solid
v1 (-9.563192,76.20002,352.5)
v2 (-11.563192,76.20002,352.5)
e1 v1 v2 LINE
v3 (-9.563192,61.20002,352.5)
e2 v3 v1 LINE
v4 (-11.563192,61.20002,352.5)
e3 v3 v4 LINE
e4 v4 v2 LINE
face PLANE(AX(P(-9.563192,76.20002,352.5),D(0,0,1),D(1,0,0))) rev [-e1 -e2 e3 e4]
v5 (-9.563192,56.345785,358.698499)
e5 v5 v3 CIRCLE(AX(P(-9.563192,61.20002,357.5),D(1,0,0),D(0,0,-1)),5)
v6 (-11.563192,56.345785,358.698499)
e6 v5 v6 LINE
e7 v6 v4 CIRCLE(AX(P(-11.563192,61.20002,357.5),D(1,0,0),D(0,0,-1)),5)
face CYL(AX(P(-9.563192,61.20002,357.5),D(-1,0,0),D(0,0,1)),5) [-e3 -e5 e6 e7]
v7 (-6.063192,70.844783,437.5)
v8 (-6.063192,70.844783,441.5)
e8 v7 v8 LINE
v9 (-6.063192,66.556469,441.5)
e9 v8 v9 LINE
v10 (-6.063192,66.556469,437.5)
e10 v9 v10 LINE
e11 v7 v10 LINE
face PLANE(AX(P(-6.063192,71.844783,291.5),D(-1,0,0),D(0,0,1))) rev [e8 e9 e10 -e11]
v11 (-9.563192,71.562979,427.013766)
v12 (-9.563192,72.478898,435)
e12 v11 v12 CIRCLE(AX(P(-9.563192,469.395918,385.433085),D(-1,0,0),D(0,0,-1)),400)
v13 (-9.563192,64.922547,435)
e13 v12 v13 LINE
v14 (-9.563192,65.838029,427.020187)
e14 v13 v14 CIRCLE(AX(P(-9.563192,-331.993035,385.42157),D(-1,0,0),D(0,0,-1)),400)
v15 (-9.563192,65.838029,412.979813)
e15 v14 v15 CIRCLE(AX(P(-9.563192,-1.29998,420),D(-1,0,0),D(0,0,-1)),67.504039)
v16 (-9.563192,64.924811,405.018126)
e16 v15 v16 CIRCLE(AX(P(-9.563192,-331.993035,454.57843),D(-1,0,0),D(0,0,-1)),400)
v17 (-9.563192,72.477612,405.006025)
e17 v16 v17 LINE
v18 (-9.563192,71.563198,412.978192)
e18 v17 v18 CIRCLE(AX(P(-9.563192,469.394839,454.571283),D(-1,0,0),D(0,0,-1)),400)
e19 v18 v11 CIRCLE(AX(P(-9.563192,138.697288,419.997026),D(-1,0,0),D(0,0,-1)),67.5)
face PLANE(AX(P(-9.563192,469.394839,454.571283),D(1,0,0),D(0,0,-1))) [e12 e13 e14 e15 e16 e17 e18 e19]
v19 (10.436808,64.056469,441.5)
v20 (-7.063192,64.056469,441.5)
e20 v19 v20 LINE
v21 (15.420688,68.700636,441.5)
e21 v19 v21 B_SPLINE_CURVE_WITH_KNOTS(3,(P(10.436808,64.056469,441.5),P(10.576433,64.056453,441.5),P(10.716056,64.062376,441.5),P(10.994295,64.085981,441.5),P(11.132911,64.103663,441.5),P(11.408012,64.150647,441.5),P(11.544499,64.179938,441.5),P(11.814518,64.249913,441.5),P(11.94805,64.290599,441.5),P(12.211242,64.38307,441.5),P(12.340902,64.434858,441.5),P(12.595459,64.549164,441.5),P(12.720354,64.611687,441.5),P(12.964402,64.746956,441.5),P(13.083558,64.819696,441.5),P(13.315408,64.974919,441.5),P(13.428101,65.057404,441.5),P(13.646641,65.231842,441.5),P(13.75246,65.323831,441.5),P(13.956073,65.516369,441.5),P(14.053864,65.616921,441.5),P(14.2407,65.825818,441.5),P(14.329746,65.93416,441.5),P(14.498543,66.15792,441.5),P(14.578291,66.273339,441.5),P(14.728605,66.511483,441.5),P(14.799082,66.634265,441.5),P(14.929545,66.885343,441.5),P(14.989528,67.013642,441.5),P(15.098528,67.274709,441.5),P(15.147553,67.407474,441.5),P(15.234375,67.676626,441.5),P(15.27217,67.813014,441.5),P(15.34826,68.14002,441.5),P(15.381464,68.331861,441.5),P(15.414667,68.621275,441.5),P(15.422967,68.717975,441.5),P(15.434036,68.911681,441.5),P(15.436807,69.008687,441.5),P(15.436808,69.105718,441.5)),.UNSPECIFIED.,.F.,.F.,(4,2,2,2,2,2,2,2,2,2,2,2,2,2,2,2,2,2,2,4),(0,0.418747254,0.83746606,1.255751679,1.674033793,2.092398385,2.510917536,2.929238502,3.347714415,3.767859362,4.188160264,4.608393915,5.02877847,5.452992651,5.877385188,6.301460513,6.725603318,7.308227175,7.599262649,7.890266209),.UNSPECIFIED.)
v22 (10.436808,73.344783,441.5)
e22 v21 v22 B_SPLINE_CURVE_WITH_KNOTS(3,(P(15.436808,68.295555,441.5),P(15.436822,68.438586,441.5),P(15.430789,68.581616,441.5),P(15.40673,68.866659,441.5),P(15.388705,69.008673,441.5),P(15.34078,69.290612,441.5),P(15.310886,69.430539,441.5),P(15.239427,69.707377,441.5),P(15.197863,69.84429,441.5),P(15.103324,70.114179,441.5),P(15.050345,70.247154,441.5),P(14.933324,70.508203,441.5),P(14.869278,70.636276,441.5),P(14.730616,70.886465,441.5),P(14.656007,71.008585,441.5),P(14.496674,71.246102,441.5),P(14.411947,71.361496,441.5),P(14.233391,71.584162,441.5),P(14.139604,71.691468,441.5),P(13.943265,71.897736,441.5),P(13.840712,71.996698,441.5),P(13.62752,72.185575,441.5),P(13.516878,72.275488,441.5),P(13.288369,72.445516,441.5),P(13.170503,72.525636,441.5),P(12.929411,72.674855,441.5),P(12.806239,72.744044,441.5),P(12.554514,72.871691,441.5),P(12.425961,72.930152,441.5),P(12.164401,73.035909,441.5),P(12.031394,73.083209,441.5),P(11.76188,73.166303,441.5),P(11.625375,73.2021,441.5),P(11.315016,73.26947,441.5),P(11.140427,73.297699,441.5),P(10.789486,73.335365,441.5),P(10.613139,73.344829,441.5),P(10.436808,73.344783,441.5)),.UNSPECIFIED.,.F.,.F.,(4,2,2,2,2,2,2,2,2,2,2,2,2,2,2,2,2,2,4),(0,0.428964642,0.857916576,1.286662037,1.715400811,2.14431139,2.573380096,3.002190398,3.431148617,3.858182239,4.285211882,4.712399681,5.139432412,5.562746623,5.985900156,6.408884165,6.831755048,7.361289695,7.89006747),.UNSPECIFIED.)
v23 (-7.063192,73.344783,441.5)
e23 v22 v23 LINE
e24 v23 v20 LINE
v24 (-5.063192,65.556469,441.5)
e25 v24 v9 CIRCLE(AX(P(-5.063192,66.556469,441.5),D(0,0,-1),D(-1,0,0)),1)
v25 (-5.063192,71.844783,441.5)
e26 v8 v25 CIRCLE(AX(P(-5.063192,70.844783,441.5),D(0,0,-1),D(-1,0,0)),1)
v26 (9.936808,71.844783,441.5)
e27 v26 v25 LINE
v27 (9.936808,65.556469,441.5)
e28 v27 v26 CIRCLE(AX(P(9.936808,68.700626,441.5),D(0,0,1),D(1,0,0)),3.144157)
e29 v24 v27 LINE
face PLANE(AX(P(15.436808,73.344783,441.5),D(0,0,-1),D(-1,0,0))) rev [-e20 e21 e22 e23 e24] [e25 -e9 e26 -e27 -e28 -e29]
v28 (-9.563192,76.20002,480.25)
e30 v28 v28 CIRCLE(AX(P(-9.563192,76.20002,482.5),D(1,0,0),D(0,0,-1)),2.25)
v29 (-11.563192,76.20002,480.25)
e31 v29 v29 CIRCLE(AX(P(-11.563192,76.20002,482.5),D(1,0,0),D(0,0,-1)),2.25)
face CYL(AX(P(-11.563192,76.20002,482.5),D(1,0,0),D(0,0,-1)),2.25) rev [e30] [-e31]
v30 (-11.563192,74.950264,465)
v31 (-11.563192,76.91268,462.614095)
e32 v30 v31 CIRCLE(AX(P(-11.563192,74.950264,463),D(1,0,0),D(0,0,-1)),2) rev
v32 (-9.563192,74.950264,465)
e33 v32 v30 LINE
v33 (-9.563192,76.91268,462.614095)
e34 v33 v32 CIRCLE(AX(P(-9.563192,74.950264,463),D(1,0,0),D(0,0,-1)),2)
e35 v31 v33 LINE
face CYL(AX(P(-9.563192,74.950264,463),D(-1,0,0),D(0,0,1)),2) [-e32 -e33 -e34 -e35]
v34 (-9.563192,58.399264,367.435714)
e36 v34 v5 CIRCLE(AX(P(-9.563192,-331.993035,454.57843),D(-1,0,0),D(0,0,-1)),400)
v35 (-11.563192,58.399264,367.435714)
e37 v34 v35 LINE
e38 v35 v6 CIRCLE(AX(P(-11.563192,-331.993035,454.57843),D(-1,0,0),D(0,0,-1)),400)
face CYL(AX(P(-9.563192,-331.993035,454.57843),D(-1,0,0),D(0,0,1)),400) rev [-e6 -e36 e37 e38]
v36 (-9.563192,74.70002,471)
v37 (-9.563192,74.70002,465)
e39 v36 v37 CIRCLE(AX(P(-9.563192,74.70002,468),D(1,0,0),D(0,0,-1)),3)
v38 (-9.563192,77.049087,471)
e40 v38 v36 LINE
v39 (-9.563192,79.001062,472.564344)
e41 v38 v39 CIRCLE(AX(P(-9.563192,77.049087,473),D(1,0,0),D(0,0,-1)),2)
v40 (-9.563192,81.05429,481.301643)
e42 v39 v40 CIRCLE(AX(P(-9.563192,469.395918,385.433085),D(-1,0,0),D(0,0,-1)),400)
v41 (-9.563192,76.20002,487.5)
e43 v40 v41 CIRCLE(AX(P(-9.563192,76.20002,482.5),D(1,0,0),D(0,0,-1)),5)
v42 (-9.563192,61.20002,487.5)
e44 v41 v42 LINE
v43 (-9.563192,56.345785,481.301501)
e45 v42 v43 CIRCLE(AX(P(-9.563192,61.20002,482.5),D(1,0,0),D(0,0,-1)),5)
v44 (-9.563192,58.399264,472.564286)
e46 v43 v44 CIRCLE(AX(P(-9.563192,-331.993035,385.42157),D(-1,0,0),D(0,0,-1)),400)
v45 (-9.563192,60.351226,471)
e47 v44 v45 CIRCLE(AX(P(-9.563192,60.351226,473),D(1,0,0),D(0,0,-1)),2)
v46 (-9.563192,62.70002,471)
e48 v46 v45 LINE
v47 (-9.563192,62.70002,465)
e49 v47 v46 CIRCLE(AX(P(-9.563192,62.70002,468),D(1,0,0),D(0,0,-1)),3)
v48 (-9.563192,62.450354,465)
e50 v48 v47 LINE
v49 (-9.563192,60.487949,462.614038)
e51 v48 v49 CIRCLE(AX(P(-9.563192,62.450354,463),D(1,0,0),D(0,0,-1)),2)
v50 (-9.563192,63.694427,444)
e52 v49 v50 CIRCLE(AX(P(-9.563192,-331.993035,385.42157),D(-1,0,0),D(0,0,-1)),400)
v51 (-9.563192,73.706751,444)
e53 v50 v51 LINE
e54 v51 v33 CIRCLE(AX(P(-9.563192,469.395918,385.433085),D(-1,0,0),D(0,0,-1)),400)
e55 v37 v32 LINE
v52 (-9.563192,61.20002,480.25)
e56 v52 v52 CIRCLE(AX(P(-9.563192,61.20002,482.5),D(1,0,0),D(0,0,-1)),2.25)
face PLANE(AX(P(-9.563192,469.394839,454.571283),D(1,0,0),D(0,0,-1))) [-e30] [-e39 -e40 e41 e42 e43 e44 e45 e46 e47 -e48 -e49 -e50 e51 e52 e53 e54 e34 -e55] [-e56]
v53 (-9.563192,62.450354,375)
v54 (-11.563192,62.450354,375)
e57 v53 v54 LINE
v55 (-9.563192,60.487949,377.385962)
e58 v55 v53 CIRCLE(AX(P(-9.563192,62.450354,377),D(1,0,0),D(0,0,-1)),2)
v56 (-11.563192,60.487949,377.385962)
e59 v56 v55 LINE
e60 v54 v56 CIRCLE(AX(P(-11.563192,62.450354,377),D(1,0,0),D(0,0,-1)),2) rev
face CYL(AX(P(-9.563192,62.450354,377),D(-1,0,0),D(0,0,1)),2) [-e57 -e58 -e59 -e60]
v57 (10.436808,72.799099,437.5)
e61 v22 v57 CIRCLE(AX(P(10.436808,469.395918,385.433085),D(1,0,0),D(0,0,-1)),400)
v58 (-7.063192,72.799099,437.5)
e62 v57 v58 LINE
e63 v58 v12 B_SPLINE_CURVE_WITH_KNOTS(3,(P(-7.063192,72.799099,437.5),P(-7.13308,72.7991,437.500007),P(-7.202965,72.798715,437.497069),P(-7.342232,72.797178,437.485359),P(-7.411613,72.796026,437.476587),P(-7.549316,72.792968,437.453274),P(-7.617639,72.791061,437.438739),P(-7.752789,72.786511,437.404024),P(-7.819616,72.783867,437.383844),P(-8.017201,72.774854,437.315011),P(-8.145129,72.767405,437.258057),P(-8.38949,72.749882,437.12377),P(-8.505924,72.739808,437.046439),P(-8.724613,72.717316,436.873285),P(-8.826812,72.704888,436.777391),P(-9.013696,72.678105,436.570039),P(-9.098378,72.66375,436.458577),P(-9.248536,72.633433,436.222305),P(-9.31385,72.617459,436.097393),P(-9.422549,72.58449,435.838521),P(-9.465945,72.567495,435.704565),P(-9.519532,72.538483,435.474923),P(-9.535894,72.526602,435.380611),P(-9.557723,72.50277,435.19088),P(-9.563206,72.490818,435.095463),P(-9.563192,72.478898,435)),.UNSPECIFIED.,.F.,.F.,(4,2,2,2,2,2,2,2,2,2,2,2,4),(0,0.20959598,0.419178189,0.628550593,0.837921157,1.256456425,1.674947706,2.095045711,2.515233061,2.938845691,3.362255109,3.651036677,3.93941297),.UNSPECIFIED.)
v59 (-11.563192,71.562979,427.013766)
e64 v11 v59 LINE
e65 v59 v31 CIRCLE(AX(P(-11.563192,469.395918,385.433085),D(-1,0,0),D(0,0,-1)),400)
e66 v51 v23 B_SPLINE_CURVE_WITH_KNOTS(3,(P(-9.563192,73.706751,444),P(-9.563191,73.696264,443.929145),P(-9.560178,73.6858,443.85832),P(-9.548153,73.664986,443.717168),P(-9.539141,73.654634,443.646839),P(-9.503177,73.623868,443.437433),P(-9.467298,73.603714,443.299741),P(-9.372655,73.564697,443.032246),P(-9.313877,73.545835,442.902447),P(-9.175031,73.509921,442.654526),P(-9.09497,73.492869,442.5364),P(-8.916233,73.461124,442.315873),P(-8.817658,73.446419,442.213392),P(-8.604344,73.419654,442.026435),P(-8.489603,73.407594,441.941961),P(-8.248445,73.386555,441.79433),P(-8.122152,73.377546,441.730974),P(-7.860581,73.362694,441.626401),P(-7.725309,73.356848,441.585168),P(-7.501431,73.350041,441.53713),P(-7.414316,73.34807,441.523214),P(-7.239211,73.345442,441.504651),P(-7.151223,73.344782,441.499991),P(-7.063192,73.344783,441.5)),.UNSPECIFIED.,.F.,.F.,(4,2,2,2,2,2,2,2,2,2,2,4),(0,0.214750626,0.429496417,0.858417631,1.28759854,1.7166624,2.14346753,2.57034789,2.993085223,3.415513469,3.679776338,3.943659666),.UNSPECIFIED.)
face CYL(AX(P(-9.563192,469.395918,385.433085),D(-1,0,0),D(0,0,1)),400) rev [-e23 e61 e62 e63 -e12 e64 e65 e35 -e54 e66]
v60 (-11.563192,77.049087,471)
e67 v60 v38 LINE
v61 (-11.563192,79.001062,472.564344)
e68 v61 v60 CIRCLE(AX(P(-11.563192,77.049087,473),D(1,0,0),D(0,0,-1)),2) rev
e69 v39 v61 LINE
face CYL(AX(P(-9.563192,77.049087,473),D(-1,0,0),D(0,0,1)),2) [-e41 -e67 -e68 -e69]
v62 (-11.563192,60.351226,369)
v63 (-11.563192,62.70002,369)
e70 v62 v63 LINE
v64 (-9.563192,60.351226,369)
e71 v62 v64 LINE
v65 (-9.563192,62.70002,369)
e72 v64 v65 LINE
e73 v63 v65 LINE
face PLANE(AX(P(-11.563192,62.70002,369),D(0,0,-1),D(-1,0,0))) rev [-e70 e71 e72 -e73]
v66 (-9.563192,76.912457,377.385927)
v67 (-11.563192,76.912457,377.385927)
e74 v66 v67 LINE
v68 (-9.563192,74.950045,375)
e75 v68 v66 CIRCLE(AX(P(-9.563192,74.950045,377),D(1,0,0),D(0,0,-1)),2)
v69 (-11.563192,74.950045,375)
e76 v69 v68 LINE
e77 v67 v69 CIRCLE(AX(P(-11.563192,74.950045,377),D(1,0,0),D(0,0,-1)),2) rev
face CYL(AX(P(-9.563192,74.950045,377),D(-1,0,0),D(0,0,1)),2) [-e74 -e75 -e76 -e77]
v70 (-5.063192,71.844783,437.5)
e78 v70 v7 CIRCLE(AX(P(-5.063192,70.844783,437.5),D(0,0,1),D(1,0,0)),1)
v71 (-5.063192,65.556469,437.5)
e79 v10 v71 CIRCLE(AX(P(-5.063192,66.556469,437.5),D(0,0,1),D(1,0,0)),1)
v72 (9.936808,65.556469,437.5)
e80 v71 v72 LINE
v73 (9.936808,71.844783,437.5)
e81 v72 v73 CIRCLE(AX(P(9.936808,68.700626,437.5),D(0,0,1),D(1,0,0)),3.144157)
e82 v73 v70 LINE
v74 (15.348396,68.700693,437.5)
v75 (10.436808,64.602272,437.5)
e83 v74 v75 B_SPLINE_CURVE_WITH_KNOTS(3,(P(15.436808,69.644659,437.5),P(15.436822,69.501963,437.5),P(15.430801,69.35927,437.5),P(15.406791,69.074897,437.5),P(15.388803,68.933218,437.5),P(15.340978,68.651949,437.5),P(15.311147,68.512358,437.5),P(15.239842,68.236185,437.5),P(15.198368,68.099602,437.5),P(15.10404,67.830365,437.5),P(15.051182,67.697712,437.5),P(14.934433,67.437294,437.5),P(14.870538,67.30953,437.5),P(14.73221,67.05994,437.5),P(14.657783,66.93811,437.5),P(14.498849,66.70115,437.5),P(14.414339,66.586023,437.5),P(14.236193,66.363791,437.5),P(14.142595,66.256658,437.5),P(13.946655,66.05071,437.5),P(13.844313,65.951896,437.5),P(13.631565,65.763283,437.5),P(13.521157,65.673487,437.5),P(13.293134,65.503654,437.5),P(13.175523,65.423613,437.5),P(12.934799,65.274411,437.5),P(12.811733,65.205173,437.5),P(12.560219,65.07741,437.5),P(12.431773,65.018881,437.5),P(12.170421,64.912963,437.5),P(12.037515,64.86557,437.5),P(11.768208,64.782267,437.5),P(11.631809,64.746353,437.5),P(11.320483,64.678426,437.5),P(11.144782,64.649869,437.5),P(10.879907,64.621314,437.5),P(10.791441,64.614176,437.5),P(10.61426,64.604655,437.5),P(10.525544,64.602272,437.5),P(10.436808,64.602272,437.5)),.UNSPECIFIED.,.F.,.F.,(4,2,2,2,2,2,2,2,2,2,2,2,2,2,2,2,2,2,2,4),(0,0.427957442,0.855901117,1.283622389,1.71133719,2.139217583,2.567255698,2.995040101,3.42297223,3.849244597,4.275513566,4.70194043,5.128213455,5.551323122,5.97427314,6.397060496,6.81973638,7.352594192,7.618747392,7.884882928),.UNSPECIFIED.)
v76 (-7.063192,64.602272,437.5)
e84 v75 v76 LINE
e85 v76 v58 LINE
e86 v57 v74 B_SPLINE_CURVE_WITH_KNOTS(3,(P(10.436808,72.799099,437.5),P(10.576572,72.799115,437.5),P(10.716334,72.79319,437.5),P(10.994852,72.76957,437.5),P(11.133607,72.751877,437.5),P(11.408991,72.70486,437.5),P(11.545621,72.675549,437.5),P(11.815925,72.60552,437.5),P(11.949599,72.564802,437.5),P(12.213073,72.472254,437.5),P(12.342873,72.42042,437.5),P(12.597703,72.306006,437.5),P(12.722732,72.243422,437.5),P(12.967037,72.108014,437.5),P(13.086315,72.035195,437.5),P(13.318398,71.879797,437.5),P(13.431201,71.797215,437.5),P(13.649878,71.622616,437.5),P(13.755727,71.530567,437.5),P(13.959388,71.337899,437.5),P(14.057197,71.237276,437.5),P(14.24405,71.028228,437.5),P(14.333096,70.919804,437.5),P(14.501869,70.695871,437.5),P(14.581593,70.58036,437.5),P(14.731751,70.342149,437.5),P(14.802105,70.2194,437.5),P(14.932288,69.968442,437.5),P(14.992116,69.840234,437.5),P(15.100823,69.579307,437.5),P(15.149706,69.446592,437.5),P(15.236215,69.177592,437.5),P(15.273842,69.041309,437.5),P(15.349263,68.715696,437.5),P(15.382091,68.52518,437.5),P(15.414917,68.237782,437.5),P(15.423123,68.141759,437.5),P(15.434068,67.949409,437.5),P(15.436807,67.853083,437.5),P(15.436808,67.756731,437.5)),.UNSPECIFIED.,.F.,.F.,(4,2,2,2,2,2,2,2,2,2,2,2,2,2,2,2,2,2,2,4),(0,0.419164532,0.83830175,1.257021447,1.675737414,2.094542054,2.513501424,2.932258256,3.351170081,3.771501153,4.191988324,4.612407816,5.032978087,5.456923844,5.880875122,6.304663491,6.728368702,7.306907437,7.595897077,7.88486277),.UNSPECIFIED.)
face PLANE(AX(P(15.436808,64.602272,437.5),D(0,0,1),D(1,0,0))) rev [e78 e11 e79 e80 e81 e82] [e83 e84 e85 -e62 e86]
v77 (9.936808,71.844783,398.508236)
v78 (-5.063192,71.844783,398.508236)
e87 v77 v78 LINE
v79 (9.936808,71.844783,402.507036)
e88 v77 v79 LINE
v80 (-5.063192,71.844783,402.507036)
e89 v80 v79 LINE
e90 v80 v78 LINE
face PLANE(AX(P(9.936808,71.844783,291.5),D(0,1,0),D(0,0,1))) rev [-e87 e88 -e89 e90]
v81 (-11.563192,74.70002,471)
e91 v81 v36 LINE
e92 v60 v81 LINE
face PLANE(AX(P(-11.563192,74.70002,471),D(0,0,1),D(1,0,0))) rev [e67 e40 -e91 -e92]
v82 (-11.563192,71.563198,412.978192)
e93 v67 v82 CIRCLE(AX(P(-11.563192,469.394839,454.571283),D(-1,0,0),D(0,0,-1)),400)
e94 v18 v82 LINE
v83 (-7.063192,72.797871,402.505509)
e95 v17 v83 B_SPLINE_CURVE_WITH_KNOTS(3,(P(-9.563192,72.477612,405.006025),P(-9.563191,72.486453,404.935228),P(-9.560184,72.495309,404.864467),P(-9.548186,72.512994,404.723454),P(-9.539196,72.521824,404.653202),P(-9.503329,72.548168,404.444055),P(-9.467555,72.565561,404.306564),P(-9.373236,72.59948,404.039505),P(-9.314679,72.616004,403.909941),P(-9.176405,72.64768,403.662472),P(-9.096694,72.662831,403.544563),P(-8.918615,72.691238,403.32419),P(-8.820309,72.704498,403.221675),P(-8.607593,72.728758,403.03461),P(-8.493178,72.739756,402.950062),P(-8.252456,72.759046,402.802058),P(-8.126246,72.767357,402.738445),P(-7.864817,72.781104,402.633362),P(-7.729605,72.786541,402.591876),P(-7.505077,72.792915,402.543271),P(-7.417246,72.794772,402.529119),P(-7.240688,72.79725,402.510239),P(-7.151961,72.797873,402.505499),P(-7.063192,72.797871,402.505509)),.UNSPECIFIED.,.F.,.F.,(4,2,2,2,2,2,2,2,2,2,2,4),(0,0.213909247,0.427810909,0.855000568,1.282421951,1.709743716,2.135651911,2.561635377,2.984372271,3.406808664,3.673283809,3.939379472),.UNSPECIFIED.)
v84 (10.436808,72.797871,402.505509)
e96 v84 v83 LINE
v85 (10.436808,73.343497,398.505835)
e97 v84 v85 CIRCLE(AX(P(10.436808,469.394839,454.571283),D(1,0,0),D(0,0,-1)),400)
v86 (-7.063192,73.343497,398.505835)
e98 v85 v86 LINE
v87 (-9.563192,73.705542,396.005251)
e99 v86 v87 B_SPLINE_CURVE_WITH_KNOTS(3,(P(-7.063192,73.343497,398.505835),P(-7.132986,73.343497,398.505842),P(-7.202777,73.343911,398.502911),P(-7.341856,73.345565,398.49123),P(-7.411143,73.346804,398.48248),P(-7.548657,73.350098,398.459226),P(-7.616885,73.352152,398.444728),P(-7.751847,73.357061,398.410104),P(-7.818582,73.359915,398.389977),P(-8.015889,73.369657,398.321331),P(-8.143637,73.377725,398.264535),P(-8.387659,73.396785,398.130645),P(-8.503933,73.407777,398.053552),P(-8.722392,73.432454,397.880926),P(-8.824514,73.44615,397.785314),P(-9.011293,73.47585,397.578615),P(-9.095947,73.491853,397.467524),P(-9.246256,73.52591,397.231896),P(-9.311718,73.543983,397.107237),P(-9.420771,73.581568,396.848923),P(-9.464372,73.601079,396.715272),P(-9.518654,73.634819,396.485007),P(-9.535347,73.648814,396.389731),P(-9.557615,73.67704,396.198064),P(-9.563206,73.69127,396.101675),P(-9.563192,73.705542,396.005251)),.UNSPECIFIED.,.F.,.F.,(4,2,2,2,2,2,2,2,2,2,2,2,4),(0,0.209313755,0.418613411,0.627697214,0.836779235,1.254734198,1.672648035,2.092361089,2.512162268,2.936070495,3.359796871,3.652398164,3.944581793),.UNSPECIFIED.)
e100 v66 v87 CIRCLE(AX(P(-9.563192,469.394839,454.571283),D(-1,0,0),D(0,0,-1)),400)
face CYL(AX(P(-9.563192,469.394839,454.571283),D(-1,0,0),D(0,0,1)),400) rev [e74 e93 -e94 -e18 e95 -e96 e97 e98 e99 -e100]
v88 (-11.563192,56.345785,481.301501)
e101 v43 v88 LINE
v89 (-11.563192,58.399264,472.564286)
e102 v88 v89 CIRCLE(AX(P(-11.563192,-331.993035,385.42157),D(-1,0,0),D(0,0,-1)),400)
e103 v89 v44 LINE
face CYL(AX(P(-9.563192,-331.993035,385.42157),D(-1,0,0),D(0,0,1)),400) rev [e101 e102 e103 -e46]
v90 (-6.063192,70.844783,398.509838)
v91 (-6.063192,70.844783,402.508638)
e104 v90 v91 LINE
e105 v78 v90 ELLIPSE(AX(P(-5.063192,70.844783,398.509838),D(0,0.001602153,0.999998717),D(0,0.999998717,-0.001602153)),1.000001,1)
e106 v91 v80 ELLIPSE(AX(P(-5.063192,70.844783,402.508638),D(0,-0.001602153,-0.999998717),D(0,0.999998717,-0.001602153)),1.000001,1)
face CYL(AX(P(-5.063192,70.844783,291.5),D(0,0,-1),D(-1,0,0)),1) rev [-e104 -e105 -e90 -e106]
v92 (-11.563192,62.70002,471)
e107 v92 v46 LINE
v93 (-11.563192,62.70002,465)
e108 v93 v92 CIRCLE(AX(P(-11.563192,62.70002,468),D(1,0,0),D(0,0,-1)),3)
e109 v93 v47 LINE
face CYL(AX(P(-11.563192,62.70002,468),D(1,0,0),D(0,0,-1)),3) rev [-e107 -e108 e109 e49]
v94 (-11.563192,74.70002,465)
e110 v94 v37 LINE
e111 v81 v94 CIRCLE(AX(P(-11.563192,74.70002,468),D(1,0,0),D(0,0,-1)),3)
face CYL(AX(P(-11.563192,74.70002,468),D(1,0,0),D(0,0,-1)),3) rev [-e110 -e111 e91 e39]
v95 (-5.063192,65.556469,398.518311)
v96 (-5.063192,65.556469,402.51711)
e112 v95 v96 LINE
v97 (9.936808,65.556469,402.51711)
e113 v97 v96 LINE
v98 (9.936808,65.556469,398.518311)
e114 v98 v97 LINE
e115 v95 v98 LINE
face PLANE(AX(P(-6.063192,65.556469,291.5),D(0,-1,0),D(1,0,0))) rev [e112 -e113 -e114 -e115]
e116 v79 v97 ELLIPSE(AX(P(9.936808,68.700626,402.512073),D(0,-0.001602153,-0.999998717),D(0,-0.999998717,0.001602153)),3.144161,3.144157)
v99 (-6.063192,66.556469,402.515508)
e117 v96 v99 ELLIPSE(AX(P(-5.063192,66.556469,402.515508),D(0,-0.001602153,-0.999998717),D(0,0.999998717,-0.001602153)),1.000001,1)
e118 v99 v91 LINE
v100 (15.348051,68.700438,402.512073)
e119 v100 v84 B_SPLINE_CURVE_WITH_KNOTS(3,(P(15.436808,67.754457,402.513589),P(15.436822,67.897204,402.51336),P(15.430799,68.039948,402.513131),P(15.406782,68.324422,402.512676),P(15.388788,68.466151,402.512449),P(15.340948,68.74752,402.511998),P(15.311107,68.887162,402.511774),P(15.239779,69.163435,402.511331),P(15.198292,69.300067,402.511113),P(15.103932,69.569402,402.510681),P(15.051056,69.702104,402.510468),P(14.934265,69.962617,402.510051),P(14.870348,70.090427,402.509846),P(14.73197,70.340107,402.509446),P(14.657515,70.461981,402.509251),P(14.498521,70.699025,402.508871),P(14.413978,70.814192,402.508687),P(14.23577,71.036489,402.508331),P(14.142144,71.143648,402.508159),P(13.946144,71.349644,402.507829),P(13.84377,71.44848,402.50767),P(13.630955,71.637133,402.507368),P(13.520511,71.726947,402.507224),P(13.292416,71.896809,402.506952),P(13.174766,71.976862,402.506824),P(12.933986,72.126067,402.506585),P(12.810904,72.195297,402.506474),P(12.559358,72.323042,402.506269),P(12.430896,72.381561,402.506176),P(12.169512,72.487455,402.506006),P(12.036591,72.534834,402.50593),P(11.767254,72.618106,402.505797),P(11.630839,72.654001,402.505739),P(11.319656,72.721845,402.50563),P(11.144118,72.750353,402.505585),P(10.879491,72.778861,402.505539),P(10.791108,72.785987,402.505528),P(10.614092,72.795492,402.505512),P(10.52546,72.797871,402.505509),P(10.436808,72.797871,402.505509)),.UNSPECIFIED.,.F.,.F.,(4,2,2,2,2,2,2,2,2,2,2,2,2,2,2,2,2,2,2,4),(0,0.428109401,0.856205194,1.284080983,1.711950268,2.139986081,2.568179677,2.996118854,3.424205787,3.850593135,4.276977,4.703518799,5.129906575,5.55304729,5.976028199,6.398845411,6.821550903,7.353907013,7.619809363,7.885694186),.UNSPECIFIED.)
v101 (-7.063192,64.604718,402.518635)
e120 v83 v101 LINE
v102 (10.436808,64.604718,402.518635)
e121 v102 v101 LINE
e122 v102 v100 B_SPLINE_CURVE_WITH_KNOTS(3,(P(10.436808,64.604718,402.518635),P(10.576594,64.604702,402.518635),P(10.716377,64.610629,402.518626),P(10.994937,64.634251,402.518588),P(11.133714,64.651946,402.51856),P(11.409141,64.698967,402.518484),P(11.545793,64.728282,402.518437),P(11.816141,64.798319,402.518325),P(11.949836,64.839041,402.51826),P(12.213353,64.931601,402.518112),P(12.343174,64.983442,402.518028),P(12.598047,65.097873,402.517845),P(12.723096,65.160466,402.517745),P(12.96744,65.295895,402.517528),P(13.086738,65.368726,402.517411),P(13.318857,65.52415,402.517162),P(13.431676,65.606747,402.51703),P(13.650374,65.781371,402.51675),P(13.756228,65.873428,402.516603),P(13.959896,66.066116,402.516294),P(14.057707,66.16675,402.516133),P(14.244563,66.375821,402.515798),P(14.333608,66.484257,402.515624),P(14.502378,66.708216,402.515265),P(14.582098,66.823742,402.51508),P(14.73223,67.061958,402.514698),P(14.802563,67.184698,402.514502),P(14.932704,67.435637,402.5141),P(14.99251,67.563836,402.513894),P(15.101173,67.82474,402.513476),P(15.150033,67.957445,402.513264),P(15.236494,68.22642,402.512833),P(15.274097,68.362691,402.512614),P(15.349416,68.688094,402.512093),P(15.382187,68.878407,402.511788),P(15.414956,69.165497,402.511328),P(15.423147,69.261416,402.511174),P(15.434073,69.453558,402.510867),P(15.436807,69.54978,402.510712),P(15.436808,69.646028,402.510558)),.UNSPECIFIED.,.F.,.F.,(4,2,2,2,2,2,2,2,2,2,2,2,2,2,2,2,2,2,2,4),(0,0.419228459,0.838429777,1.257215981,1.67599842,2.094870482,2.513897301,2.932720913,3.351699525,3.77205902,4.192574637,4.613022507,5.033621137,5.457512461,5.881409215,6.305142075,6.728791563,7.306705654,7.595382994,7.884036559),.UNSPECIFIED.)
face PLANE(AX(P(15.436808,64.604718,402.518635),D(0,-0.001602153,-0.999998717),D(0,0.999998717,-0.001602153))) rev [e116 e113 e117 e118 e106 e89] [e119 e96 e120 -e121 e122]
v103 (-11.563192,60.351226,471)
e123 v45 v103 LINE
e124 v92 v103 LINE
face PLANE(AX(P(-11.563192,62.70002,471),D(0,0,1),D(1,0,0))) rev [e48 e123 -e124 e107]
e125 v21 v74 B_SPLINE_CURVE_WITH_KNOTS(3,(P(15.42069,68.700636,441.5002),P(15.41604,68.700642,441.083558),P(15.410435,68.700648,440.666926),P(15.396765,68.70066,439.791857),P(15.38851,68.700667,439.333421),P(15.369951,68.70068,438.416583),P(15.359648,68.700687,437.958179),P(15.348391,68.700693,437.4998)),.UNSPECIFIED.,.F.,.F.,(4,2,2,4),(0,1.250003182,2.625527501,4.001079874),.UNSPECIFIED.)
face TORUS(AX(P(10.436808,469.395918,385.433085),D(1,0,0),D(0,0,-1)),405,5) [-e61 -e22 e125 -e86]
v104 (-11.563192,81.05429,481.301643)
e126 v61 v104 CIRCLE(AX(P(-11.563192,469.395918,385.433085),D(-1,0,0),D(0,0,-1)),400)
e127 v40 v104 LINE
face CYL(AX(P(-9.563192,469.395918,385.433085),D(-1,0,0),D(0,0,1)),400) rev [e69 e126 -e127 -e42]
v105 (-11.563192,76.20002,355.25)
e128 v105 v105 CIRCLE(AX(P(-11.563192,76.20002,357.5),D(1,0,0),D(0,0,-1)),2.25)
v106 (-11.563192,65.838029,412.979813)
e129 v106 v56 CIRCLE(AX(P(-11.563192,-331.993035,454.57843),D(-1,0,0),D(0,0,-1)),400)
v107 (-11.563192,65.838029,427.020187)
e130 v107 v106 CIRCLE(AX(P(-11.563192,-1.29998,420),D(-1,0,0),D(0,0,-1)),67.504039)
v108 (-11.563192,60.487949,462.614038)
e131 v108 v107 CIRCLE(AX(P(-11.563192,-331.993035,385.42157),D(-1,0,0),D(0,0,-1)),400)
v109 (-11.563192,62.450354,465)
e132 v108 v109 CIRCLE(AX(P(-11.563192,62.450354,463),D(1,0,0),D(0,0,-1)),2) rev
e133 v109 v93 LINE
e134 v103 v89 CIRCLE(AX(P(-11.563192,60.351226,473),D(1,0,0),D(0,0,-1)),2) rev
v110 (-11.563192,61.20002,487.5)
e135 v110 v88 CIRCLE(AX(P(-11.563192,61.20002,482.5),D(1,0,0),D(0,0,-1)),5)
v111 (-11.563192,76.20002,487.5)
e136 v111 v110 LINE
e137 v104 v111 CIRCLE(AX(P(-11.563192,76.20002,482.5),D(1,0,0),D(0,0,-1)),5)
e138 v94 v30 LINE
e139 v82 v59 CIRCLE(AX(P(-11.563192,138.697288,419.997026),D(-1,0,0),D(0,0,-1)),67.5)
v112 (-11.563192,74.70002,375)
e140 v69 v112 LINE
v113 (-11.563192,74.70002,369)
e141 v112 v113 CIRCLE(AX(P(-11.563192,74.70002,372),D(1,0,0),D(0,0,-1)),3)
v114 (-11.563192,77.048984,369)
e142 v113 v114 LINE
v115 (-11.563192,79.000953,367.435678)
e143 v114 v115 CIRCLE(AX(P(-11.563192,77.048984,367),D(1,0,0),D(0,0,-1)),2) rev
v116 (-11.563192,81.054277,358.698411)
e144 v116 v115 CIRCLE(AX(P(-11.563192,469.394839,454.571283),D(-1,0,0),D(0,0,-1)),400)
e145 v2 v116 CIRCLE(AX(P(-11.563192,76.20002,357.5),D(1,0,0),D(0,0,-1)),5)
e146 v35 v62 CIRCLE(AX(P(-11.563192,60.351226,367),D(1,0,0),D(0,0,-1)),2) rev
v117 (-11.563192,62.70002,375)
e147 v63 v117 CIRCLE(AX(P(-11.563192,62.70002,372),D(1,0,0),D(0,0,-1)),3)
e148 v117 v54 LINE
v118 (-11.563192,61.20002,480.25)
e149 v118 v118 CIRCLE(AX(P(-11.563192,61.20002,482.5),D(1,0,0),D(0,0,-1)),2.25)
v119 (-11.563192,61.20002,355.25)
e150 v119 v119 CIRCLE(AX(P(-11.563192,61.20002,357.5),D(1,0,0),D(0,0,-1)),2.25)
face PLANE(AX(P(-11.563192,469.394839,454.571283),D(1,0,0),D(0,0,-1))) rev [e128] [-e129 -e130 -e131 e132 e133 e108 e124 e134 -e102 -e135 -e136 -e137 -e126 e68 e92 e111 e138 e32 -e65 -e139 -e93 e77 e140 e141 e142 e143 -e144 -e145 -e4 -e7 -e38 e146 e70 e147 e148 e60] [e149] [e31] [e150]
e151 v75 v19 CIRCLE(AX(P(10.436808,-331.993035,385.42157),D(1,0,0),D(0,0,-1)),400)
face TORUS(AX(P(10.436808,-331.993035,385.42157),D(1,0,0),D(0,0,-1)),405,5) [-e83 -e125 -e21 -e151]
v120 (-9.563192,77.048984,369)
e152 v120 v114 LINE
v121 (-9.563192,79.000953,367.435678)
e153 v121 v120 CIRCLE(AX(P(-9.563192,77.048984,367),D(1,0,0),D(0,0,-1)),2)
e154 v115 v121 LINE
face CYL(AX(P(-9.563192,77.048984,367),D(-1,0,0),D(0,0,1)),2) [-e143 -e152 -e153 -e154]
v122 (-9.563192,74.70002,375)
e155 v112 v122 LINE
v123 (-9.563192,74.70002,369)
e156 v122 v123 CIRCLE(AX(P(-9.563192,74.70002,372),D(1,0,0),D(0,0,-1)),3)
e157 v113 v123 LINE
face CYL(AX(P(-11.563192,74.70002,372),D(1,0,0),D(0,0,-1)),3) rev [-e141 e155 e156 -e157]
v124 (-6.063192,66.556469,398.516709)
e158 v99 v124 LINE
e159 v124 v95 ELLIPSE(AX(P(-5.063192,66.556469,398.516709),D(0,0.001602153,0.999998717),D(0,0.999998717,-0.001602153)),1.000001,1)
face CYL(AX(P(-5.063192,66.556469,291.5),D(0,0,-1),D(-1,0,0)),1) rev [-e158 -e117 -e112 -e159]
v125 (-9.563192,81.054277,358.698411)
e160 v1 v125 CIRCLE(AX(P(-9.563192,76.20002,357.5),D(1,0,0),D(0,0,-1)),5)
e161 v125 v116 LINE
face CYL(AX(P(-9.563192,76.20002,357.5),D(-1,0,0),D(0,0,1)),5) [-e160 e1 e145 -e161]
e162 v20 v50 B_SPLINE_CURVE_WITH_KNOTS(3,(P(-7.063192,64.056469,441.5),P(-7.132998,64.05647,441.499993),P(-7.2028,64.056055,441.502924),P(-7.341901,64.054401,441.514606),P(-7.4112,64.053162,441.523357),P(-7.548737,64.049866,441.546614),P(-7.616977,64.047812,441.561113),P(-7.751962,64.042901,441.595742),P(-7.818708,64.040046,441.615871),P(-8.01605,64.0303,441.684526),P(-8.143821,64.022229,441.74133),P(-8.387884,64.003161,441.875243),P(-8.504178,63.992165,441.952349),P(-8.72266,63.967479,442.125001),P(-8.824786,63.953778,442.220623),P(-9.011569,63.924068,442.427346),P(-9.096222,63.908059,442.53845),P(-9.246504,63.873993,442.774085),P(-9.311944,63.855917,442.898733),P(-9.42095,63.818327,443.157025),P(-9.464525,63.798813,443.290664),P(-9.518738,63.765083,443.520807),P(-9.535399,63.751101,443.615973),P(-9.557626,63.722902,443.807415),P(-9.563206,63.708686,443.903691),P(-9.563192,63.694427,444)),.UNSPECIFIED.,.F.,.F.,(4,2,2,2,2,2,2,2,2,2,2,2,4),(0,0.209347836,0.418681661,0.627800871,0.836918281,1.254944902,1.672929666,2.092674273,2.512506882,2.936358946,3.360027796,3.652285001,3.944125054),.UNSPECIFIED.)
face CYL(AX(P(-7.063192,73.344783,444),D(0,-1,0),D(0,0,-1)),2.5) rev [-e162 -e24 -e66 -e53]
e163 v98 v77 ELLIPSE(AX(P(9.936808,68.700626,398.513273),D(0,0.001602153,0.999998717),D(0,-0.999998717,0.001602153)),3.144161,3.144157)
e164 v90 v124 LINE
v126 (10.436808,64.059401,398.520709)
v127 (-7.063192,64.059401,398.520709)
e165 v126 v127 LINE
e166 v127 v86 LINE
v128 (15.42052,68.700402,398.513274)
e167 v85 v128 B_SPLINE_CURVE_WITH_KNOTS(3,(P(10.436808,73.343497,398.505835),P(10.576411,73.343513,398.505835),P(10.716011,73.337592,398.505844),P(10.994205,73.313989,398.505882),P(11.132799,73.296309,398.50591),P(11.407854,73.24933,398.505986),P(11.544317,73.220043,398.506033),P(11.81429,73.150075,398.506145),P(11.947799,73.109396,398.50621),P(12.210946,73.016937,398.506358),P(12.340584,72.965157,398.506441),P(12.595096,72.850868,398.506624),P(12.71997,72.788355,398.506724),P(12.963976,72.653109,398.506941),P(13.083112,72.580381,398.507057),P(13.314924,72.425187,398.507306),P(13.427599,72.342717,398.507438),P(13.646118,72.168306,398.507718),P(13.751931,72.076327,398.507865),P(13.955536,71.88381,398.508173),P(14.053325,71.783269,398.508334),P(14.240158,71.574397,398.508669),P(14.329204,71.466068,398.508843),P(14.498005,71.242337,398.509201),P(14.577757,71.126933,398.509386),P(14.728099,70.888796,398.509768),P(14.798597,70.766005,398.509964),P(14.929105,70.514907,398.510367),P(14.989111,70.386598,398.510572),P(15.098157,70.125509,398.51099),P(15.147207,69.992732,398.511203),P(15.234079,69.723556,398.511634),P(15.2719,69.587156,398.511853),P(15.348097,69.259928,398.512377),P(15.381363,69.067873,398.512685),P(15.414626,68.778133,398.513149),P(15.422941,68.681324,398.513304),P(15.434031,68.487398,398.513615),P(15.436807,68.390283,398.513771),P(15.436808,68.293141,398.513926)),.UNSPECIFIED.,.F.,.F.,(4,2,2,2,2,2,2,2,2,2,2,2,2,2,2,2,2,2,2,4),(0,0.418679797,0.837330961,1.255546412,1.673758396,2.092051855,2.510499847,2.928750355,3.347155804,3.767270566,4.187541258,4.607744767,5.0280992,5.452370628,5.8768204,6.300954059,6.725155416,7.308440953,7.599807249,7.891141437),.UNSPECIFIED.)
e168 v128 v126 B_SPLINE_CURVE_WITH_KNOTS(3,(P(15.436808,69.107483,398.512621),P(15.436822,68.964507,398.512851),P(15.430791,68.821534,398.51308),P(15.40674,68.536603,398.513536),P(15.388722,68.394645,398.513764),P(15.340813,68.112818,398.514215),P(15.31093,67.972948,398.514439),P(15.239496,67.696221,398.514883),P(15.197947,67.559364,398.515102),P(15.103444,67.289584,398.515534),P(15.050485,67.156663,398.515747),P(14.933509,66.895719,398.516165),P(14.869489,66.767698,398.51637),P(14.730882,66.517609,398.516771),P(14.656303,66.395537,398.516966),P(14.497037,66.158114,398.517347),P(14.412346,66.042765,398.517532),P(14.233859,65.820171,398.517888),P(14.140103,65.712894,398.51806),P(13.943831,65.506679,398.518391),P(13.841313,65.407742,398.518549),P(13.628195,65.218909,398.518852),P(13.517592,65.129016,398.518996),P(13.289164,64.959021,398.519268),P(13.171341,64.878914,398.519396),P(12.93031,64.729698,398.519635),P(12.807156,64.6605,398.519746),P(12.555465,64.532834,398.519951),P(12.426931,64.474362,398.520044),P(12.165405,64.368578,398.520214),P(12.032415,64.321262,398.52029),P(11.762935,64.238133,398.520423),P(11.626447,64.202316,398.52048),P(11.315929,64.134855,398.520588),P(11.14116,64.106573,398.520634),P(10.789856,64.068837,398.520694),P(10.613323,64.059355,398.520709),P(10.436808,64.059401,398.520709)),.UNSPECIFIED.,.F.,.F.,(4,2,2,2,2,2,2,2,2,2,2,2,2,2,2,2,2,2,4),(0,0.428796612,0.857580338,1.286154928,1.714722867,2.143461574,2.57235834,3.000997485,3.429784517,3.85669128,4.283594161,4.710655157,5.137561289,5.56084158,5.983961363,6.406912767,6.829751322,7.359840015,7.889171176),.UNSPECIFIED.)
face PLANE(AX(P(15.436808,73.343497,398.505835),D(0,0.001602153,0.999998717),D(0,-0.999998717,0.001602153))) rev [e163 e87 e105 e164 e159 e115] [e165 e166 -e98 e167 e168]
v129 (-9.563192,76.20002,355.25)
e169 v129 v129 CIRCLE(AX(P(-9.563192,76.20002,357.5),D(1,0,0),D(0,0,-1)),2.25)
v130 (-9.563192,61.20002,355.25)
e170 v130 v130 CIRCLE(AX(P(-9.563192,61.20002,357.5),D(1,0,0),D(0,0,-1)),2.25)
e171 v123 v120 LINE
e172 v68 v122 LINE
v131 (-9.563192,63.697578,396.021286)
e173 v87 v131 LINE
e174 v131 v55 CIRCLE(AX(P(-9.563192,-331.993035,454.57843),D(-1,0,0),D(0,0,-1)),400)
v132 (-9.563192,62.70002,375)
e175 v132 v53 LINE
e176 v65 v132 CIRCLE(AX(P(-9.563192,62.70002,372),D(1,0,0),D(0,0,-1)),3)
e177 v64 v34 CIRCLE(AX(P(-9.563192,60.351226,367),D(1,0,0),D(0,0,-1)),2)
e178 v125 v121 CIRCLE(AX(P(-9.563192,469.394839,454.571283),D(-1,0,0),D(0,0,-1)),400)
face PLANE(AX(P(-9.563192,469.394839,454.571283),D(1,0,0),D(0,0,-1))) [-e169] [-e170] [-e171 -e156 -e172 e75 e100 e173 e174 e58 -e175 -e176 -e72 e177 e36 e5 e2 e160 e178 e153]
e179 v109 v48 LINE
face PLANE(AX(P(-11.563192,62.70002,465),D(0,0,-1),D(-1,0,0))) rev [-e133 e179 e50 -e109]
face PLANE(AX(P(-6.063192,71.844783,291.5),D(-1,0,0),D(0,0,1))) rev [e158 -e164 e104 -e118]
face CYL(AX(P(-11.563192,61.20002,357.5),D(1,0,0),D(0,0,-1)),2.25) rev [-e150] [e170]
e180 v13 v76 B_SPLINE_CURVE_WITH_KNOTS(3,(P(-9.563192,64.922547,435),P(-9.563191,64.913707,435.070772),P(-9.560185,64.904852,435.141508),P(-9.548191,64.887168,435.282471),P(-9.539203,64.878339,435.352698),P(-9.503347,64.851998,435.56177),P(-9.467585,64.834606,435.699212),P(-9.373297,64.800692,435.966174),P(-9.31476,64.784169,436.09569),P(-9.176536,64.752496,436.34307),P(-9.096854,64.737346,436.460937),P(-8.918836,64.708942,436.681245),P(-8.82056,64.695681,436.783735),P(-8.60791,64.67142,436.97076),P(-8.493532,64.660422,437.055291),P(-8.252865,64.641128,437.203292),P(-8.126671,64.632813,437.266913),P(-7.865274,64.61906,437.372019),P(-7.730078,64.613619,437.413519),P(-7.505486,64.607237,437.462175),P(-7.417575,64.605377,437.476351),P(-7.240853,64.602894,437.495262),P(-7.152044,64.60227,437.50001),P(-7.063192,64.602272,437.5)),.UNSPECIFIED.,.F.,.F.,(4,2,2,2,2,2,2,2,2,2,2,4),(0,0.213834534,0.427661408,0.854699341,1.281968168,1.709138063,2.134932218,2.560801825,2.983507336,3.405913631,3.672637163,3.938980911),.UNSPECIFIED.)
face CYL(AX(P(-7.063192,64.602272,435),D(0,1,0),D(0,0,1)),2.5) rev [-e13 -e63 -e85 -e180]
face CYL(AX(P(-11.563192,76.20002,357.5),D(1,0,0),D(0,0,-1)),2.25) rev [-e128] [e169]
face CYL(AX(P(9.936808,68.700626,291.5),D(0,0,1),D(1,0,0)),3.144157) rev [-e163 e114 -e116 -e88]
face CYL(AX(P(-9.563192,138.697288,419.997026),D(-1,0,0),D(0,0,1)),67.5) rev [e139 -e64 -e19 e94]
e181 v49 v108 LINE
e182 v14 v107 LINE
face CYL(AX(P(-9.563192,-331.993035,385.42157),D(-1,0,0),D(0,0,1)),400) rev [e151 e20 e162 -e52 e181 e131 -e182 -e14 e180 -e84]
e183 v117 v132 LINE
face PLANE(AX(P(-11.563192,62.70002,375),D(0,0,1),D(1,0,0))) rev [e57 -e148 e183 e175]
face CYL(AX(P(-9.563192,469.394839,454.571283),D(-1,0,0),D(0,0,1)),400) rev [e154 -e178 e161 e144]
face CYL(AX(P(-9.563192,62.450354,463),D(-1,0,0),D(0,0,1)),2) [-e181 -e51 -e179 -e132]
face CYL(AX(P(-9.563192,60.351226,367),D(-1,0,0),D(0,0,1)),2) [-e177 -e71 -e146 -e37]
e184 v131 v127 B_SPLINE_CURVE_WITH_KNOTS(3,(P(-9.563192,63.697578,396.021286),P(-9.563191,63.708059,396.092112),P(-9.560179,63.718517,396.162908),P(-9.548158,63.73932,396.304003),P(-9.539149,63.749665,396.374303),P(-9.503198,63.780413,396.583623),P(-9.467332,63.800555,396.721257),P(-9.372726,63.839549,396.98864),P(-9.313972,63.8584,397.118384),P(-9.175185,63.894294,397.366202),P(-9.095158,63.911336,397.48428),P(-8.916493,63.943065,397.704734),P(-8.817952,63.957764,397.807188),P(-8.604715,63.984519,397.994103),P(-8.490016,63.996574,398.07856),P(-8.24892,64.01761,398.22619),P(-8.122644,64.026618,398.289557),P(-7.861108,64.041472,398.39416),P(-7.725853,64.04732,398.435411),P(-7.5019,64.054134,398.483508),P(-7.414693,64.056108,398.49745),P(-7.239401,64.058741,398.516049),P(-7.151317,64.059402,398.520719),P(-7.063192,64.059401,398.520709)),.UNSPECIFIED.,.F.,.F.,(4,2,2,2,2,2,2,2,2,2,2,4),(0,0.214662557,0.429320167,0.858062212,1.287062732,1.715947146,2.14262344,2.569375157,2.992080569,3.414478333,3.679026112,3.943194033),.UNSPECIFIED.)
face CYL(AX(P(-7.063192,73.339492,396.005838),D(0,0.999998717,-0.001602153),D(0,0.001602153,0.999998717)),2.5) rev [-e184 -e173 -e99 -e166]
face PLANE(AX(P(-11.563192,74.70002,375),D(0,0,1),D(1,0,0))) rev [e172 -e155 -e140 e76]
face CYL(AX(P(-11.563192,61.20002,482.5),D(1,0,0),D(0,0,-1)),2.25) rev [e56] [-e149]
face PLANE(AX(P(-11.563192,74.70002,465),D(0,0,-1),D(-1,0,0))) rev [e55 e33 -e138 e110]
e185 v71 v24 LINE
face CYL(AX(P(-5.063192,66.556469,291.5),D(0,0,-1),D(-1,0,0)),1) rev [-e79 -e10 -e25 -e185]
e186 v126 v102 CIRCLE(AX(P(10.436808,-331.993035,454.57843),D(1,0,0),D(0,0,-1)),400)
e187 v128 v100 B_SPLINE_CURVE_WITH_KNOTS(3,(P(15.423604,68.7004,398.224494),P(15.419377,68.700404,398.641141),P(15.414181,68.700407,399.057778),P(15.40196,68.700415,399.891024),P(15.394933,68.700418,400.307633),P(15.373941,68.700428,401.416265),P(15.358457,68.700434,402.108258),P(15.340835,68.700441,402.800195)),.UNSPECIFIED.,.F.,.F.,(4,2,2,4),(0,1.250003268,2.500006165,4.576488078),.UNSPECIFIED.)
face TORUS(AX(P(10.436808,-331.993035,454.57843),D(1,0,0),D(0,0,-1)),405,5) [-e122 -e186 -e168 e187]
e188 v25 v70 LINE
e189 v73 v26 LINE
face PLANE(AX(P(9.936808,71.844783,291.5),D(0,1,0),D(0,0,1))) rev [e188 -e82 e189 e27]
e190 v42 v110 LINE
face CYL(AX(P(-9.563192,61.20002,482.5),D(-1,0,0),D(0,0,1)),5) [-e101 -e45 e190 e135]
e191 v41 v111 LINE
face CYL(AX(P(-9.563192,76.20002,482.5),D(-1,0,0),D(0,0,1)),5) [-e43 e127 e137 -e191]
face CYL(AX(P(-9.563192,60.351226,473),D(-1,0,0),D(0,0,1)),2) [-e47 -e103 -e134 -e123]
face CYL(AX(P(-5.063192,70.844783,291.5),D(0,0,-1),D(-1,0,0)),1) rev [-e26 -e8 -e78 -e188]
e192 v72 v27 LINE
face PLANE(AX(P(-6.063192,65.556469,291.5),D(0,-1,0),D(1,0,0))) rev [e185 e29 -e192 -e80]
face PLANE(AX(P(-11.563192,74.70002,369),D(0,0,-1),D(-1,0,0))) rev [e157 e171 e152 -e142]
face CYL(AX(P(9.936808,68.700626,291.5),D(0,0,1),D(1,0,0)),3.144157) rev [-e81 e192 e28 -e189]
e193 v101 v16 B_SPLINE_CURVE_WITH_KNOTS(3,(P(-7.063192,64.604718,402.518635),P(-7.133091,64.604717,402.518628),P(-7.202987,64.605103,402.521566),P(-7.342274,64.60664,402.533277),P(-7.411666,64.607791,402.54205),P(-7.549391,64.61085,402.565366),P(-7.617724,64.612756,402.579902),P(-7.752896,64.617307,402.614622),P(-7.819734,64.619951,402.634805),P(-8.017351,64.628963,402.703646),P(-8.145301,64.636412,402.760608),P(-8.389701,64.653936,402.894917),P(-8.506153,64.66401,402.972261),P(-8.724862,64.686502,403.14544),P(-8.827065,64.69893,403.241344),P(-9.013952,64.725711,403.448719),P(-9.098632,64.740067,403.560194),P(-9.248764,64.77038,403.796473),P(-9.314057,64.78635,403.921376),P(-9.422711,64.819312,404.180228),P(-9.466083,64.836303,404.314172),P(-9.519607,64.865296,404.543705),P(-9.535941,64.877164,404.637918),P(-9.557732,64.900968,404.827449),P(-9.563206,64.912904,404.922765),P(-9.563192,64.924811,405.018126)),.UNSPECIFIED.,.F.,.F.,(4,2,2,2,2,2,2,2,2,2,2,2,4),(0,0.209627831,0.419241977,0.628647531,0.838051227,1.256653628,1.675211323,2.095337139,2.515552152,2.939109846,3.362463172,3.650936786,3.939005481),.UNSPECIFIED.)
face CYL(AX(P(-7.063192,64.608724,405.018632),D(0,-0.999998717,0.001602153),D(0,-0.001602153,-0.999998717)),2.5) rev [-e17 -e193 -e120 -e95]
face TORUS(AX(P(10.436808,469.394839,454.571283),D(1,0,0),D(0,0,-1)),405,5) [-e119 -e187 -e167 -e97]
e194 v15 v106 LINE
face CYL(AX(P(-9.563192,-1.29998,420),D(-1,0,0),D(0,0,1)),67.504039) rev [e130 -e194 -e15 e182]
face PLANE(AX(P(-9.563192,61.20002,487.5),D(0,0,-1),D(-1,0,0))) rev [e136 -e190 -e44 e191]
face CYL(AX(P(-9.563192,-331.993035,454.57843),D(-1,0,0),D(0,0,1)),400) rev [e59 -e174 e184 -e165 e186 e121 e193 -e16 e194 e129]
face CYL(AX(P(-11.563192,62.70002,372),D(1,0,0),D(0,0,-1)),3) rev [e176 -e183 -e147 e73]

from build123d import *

# Parameters (mm, degrees)
SALIENTE_EXTRUIR1_DEPTH = 2
CORTAR_EXTRUIR1_START   = -2
CROQUIS2_R              = 2.2499999999999543
CROQUIS2_R_2            = 2.2499999999999525
CORTAR_EXTRUIR1_DEPTH   = 2
SALIENTE_EXTRUIR2_DEPTH = 25
REDONDEO1_R             = 5
REDONDEO2_R             = 2.5
CORTAR_EXTRUIR2_DEPTH   = 150
REDONDEO3_R             = 1
REDONDEO4_R             = 2


with BuildPart() as part:
    # Croquis1 → Saliente-Extruir1 (new body)
    with BuildSketch(Plane(origin=(-11.563192139466418, 0, 0), x_dir=(0, 0, -1), z_dir=(1, 0, 0))):
        with BuildLine():
            Line((-487.50000000000006, 61.20002010491962), (-487.50000000000006, 76.20002010491963))
            ThreePointArc((-487.50000000000006, 76.20002010491963), (-485.5828732625374, 80.13650234762473), (-481.3016430211471, 81.05429044671504))
            ThreePointArc((-481.3016430211471, 81.05429044671504), (-454.3213610685335, 75.37256140046077), (-427.01376608968735, 71.56297931460594))
            ThreePointArc((-427.01376608968735, 71.56297931460594), (-419.99597330488047, 71.19728769059765), (-412.9781919309264, 71.56319822849083))
            ThreePointArc((-412.9781919309264, 71.56319822849083), (-385.6746727662309, 75.37294023507445), (-358.6984109055162, 81.05427713370786))
            ThreePointArc((-358.6984109055162, 81.05427713370786), (-354.4171486029636, 80.13651947158925), (-352.50000000000006, 76.20002010491963))
            Line((-352.50000000000006, 76.20002010491963), (-352.50000000000006, 61.20002010491962))
            ThreePointArc((-352.50000000000006, 61.20002010491962), (-354.41718437935106, 57.26349272039885), (-358.698499139633, 56.3457848600743))
            ThreePointArc((-358.698499139633, 56.3457848600743), (-385.67550243814526, 62.027759813352475), (-412.9798133969885, 65.8380287540453))
            ThreePointArc((-412.9798133969885, 65.8380287540453), (-420, 66.20405869011226), (-427.02018660301155, 65.83802875404524))
            ThreePointArc((-427.02018660301155, 65.83802875404524), (-454.3244975618549, 62.027759813352304), (-481.3015008603671, 56.34578486007424))
            ThreePointArc((-481.3015008603671, 56.34578486007424), (-485.5828156206491, 57.2634927203988), (-487.50000000000006, 61.20002010491962))
        make_face()
    extrude(amount=SALIENTE_EXTRUIR1_DEPTH)

    # Croquis2 → Cortar-Extruir1 (cut)
    with BuildSketch(Plane(origin=(-9.563192139466418, 0, 0), x_dir=(0, 0, -1), z_dir=(1, 0, 0)).offset(CORTAR_EXTRUIR1_START)):
        with Locations((-357.50000000000006, 61.20002010491962)):
            Circle(CROQUIS2_R)
        with Locations((-482.50000000000006, 61.20002010491962)):
            Circle(CROQUIS2_R)
        with Locations((-482.50000000000006, 76.20002010491963)):
            Circle(CROQUIS2_R_2)
        with Locations((-357.50000000000006, 76.20002010491963)):
            Circle(CROQUIS2_R_2)
        with BuildLine():
            Line((-471.00000000000006, 74.70002010491963), (-471.00000000000006, 78.65520707766471))
            ThreePointArc((-471.00000000000006, 78.65520707766471), (-468.00242565546085, 78.0108082929201), (-465, 77.3894050999363))
            Line((-465, 77.3894050999363), (-465, 74.70002010491963))
            ThreePointArc((-465, 74.70002010491963), (-468, 71.70002010491957), (-471.00000000000006, 74.70002010491963))
        make_face()
        with BuildLine():
            Line((-471.00000000000006, 62.70002010491962), (-471.00000000000006, 58.745154173439786))
            ThreePointArc((-471.00000000000006, 58.745154173439786), (-468.0024260238705, 59.38964522535156), (-465, 60.011140542750915))
            Line((-465, 60.011140542750915), (-465, 62.70002010491962))
            ThreePointArc((-465, 62.70002010491962), (-468, 65.70002010491962), (-471.00000000000006, 62.70002010491962))
        make_face()
        with BuildLine():
            Line((-375.00000000000006, 74.70002010492064), (-375.00000000000006, 77.3892133718565))
            ThreePointArc((-375.00000000000006, 77.3892133718565), (-371.9975742047899, 78.0106515107218), (-369.00000000000006, 78.65508529549625))
            Line((-369.00000000000006, 78.65508529549625), (-369.00000000000006, 74.70002010492064))
            ThreePointArc((-369.00000000000006, 74.70002010492064), (-372.00000000000006, 71.70002010492064), (-375.00000000000006, 74.70002010492064))
        make_face()
        with BuildLine():
            Line((-375.00000000000006, 62.700020104920625), (-375.00000000000006, 60.01114054275103))
            ThreePointArc((-375.00000000000006, 60.01114054275103), (-371.9975739761297, 59.38964522535167), (-369.00000000000006, 58.74515417343995))
            Line((-369.00000000000006, 58.74515417343995), (-369.00000000000006, 62.700020104920625))
            ThreePointArc((-369.00000000000006, 62.700020104920625), (-372.00000000000006, 65.70002010492063), (-375.00000000000006, 62.700020104920625))
        make_face()
    extrude(amount=CORTAR_EXTRUIR1_DEPTH, mode=Mode.SUBTRACT)

    # Croquis3 → Saliente-Extruir2 (add)
    with BuildSketch(Plane(origin=(-9.563192139466418, 0, 0), x_dir=(0, 0, -1), z_dir=(1, 0, 0))):
        with BuildLine():
            Line((-441.5, 73.34478345263268), (-441.5, 64.0564693169966))
            ThreePointArc((-441.5, 64.0564693169966), (-439.500688579451, 64.33441688299206), (-437.50000000000006, 64.60227172023619))
            Line((-437.50000000000006, 64.60227172023619), (-437.50000000000006, 72.79909943134032))
            ThreePointArc((-437.50000000000006, 72.79909943134032), (-439.5006884273723, 73.06689509761537), (-441.5, 73.34478345263268))
        make_face()
        with BuildLine():
            Line((-402.51863522626155, 64.60471833694513), (-402.5055085249573, 72.7978713543057))
            ThreePointArc((-402.5055085249573, 72.7978713543057), (-400.5049833223084, 73.06563889552336), (-398.50583471542444, 73.34349747494228))
            Line((-398.50583471542444, 73.34349747494228), (-398.52070927713964, 64.05940108438512))
            ThreePointArc((-398.52070927713964, 64.05940108438512), (-400.5189846456923, 64.33710080901727), (-402.51863522626155, 64.60471833694513))
        make_face()
    extrude(amount=SALIENTE_EXTRUIR2_DEPTH)

    # Redondeo1
    # the kernel refuses this fillet: 5 mm, written as the material it takes off along each edge
    with BuildSketch(Plane(origin=(15.436807860533582, -331.99303473076, 454.57843031070206), x_dir=(0, 0.9852688696585968, -0.17101243955242207), z_dir=(0, -0.17101243955242207, -0.9852688696585968))) as redondeo1_piece_1:
        with BuildLine():
            CenterArc((400.0000000032307 + REDONDEO1_R, -REDONDEO1_R), REDONDEO1_R, 90, 90)
            Line((400.0000000032307 + REDONDEO1_R, 0), (400.0000000032307, 0))
            Line((400.0000000032307, 0), (400.0000000032307, -REDONDEO1_R))
        make_face()
    revolve(axis=Axis((15.436807860533582, -331.99303473076, 454.57843031070206), (1, 0, 0)), revolution_arc=4.158952056224013, mode=Mode.SUBTRACT)
    with BuildSketch(Plane(origin=(15.436807860533582, 469.39483943387535, 454.5712833464088), x_dir=(0, -0.9950753091360283, -0.09912178947051785), z_dir=(0, -0.09912178947051785, 0.9950753091360283))) as redondeo1_piece_2:
        with BuildLine():
            CenterArc((399.9999999970836 + REDONDEO1_R, -REDONDEO1_R), REDONDEO1_R, 90, 90)
            Line((399.9999999970836 + REDONDEO1_R, 0), (399.9999999970836, 0))
            Line((399.9999999970836, 0), (399.9999999970836, -REDONDEO1_R))
        make_face()
    revolve(axis=Axis((15.436807860533582, 469.39483943387535, 454.5712833464088), (1, 0, 0)), revolution_arc=4.159206104487057, mode=Mode.SUBTRACT)
    with BuildSketch(Plane(origin=(15.436807860533582, 469.3959177926432, 385.43308471259814), x_dir=(0, -0.9950750240944541, 0.09912465093719791), z_dir=(0, -0.09912465093719791, -0.9950750240944541))) as redondeo1_piece_3:
        with BuildLine():
            CenterArc((400.0000000023156 + REDONDEO1_R, REDONDEO1_R), REDONDEO1_R, 180, 90)
            Line((400.0000000023156 + REDONDEO1_R, 0), (400.0000000023156, 0))
            Line((400.0000000023156, 0), (400.0000000023156, REDONDEO1_R))
        make_face()
    revolve(axis=Axis((15.436807860533582, 469.3959177926432, 385.43308471259814), (-1, 0, 0)), revolution_arc=4.159253520630329, mode=Mode.SUBTRACT)
    with BuildSketch(Plane(origin=(15.436807860533582, -331.99303472992847, 385.4215696894115), x_dir=(0, 0.9852599261695624, 0.1710639584610054), z_dir=(0, -0.1710639584610054, 0.9852599261695624))) as redondeo1_piece_4:
        with BuildLine():
            CenterArc((400.00000000239186 + REDONDEO1_R, REDONDEO1_R), REDONDEO1_R, 180, 90)
            Line((400.00000000239186 + REDONDEO1_R, 0), (400.00000000239186, 0))
            Line((400.00000000239186, 0), (400.00000000239186, REDONDEO1_R))
        make_face()
    revolve(axis=Axis((15.436807860533582, -331.99303472992847, 385.4215696894115), (-1, 0, 0)), revolution_arc=4.159255812959428, mode=Mode.SUBTRACT)

    # Redondeo2
    redondeo2_edges = [part.edges().sort_by_distance(p)[0] for p in [
        (-9.563192139466418, 68.70062638481464, 441.5),
        (-9.563192139466418, 68.70068557578826, 437.50000000000006),
        (-9.563192139466418, 68.7014492796637, 398.51327199628207),
        (-9.563192139466418, 68.70129484562541, 402.5120718756094),
    ]]
    fillet(redondeo2_edges, radius=REDONDEO2_R)

    # Croquis4 → Cortar-Extruir2 (cut)
    with BuildSketch(Plane.XY.offset(441.5)):
        with BuildLine():
            Line((9.936807860533582, 71.84478345263268), (-6.063192139466418, 71.84478345263268))
            Line((-6.063192139466418, 71.84478345263268), (-6.063192139466418, 65.5564693169966))
            Line((-6.063192139466418, 65.5564693169966), (9.936807860533582, 65.55646931699658))
            ThreePointArc((9.936807860533582, 65.55646931699658), (13.080964928351639, 68.70062638481464), (9.936807860533582, 71.84478345263268))
        make_face()
    extrude(amount=-CORTAR_EXTRUIR2_DEPTH, mode=Mode.SUBTRACT)

    # Redondeo3
    redondeo3_edges = [part.edges().sort_by_distance(p)[0] for p in [
        (-6.063192139466418, 65.5564693169966, 439.5),
        (-6.063192139466418, 65.5564693169966, 400.51771055769314),
        (-6.063192139466418, 71.84478345263268, 439.5),
        (-6.063192139466418, 71.84478345263268, 400.5076357035813),
    ]]
    fillet(redondeo3_edges, radius=REDONDEO3_R)

    # Redondeo4
    redondeo4_edges = [part.edges().sort_by_distance(p)[0] for p in [
        (-10.563192139466418, 58.74515417343996, 369.00000000000006),
        (-10.563192139466418, 60.011140542751036, 375.00000000000006),
        (-10.563192139466418, 77.38921337185644, 375),
        (-10.563192139466418, 78.6550852954962, 369.00000000000006),
        (-10.563192139466418, 60.01114054275092, 465),
        (-10.563192139466418, 58.74515417343982, 471.00000000000006),
        (-10.563192139466418, 78.6552070776647, 471.00000000000006),
        (-10.563192139466418, 77.38940509993628, 465),
    ]]
    fillet(redondeo4_edges, radius=REDONDEO4_R)


solid = part.part
